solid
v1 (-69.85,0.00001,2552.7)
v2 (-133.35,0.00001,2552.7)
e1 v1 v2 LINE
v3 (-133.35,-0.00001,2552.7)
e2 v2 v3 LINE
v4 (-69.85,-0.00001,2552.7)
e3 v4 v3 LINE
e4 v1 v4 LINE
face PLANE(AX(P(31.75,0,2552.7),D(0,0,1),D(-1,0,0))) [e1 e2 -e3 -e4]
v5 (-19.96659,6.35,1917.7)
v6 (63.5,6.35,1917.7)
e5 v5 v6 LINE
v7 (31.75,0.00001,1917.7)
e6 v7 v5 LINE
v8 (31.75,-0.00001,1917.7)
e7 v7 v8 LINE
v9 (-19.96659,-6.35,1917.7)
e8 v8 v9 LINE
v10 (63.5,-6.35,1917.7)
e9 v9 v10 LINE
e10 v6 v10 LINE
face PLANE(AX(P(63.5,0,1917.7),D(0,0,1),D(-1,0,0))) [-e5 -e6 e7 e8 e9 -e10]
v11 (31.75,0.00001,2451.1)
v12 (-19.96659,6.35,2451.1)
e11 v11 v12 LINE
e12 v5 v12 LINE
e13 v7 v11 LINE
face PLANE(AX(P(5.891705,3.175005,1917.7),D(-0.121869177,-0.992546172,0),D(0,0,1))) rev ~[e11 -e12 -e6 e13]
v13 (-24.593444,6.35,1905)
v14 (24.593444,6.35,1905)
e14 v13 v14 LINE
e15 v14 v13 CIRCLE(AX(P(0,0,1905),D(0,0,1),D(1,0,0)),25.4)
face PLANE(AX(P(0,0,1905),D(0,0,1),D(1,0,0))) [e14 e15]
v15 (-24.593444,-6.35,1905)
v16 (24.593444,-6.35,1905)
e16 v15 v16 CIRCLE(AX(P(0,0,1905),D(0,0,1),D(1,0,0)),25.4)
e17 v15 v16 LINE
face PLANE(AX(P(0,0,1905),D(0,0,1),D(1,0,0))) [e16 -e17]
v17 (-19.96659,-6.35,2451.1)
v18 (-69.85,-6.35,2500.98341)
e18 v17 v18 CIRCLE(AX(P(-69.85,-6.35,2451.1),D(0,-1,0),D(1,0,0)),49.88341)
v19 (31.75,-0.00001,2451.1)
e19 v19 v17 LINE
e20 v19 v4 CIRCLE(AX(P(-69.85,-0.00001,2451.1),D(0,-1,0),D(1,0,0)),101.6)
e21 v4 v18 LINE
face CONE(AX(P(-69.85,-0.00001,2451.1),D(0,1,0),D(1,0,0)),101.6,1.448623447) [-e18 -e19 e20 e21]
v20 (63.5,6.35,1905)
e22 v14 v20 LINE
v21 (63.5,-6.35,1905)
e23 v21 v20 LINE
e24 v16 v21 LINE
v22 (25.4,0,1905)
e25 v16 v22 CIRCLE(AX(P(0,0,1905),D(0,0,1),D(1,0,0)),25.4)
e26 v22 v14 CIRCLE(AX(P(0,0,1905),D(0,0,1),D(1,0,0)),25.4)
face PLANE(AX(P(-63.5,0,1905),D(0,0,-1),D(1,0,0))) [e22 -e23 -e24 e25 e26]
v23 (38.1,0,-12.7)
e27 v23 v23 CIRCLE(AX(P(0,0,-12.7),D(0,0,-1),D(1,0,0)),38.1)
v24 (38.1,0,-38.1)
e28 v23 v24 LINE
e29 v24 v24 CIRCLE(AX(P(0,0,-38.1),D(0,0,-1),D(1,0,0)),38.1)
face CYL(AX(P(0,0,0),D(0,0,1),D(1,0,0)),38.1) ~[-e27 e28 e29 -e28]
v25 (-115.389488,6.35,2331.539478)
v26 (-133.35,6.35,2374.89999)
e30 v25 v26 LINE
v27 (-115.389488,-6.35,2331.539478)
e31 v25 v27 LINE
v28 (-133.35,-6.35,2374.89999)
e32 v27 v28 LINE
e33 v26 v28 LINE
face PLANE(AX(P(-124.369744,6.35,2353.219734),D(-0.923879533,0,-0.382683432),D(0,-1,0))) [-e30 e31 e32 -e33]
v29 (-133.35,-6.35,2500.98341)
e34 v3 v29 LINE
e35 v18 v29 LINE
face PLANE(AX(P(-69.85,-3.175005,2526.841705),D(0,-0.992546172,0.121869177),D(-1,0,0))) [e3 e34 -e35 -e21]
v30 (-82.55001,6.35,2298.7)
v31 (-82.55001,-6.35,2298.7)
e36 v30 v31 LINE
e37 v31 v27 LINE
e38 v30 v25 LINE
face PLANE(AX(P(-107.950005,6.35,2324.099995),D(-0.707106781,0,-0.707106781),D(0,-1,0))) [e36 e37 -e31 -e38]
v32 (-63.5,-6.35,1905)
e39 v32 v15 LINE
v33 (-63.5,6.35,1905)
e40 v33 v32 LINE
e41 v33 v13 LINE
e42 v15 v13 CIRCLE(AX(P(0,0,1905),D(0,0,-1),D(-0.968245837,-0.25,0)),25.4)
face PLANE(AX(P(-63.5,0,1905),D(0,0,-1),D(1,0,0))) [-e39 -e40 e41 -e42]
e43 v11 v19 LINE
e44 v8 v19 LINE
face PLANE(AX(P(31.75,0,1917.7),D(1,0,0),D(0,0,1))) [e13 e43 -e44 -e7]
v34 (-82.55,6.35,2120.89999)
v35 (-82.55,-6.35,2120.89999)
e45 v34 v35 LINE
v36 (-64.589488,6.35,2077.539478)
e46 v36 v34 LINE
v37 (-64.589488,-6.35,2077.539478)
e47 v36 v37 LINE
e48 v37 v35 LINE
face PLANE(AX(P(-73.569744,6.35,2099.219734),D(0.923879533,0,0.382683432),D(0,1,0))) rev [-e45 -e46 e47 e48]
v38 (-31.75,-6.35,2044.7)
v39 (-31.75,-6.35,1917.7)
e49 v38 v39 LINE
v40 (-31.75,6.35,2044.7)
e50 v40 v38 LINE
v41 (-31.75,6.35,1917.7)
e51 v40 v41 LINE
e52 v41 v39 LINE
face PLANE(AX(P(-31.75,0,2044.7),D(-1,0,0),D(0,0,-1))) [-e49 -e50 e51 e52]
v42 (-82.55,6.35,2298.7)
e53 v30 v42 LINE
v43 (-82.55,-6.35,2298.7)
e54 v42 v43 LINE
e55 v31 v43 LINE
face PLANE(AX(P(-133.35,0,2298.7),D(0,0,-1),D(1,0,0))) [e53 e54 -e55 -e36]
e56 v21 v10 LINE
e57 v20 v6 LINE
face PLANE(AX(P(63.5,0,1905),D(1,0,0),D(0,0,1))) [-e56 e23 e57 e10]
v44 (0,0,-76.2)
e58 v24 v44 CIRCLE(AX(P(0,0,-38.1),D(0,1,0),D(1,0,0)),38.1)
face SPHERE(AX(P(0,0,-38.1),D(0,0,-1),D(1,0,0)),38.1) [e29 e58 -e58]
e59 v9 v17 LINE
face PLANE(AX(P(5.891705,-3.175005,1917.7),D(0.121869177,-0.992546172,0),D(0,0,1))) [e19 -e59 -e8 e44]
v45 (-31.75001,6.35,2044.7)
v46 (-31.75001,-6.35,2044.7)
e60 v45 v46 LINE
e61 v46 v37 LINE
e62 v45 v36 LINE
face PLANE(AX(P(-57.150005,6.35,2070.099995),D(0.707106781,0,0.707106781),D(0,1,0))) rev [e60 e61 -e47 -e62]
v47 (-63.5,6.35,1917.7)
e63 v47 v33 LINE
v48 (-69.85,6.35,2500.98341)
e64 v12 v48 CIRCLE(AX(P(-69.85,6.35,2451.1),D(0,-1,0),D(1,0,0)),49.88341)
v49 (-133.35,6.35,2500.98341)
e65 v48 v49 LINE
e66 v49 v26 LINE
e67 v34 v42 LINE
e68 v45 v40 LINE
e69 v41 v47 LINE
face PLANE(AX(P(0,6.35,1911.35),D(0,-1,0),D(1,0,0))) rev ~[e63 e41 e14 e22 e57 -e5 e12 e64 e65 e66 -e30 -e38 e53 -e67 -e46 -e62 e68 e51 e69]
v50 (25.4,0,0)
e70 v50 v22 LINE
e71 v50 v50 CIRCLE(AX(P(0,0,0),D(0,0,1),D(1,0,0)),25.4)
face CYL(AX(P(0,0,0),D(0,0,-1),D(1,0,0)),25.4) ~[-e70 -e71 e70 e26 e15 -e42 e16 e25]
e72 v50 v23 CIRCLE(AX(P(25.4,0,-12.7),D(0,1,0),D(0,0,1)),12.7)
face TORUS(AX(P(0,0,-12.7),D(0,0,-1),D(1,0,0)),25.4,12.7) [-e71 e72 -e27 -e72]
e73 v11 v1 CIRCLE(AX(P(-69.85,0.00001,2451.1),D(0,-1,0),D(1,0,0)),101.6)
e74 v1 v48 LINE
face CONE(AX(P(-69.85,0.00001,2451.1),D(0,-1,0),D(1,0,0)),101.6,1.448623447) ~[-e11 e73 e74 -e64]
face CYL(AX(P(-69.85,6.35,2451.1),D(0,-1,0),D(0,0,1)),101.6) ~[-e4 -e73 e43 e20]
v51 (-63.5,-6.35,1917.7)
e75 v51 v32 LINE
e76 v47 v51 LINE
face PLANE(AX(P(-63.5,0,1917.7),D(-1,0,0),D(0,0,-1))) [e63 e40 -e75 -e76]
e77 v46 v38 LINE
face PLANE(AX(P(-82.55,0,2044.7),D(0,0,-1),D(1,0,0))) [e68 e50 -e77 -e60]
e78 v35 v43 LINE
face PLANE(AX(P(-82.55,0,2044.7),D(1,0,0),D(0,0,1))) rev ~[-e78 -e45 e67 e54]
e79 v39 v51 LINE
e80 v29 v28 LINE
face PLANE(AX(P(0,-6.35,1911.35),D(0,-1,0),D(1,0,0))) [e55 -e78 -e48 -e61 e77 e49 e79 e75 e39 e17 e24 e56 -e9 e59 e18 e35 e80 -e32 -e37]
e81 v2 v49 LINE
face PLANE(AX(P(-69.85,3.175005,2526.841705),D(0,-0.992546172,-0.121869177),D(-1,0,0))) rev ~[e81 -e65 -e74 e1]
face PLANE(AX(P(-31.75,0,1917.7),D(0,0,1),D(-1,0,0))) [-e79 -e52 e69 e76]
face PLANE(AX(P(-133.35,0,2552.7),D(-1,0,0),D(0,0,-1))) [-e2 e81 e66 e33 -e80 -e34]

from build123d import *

# Parameters (mm, degrees)
F0_R          = 25.4
F1_DEPTH      = 1905
F2_R          = 38.1
F3_DEPTH      = 76.2
F4_W          = 50.8
F4_H          = 254
F5_DEPTH      = 6.35
F5_DEPTH_BACK = 6.35
F6_SIZE       = 50.79999
F7_R          = 101.6
F8_SIZE2      = 51.71659
F8_SIZE       = 6.34999
F9_SIZE       = 25.4
F11_R         = 38.1


# Not quite as in the source:
# - a fillet or chamfer that OpenCascade refuses, or shapes differently, is made with other operations: its cross-section is extruded or revolved along the edge and cut away or added
# - a fillet or chamfer is up to 0.001 mm smaller than in the source, because OpenCascade refuses the exact size


with BuildPart() as f1:
    # F0 (on Top) → F1 (new body)
    with BuildSketch(Plane.XY):
        Circle(F0_R)
    extrude(amount=F1_DEPTH)

    # F2 (on face) → F3 (join)
    with BuildSketch(Plane(origin=(0, 0, 0), x_dir=(1, 0, 0), z_dir=(0, 0, -1))):
        Circle(F2_R)
    extrude(amount=F3_DEPTH)

    # F4 (on Front) → F5 (join, two sides)
    with BuildSketch(Plane.XZ) as f5_sk:
        Polygon((-25.4, 1905), (0, 1905), (25.4, 1905), (63.5, 1905), (63.5, 1917.7), (31.75, 1917.7), (0, 1917.7), (-31.75, 1917.7), (-63.5, 1917.7), (-63.5, 1905), align=None)
        Polygon((0, 1917.7), (31.75, 1917.7), (31.75, 2552.7), (-31.75, 2552.7), (-31.75, 2298.7), (-31.75, 2044.7), (-31.75, 1917.7), align=None)
        with Locations((-57.15, 2171.7)):
            Rectangle(F4_W, F4_H)
        Polygon((-31.75, 2298.7), (-31.75, 2552.7), (-133.35, 2552.7), (-133.35, 2298.7), (-82.55, 2298.7), align=None)
    extrude(amount=F5_DEPTH)
    extrude(f5_sk.sketch, amount=-F5_DEPTH_BACK)

    # F6 (size 50.8 in the source; OpenCascade refuses exactly that, so slightly less here)
    f6_edges = [f1.edges().sort_by_distance(p)[0] for p in [
        (-133.35, 0, 2298.7),
        (-82.55, 0, 2044.7),
    ]]
    chamfer(f6_edges, length=F6_SIZE)

    # F7
    f7_edges = [f1.edges().sort_by_distance(p)[0] for p in [
        (31.75, 0, 2552.7),
    ]]
    fillet(f7_edges, radius=F7_R)

    # F8 (size 6.35 and 51.7165998176 in the source; OpenCascade refuses exactly that, so slightly less here)
    f8_edges = [f1.edges().sort_by_distance(p)[0] for p in [
        (31.75, 6.35, 2184.4),
        (31.75, -6.35, 2184.4),
    ]]
    f8_side = f1.faces().sort_by_distance((31.75, 0, 2184.4))[0]
    chamfer(f8_edges, length=F8_SIZE, length2=F8_SIZE2, reference=f8_side)

    # F9
    f9_edges = [f1.edges().sort_by_distance(p)[0] for p in [
        (-133.35, 0, 2349.49999),
        (-82.55, 0, 2095.49999),
    ]]
    chamfer(f9_edges, length=F9_SIZE)

    # F10: fillet of radius 12.7 on 1 edges, made by hand

    # F10_s1 → F10_t2 (revolve, cut)
    with BuildSketch(Plane.XZ):
        with BuildLine():
            ThreePointArc((25.4, 0), (34.3802561211, -3.7197438789), (38.1, -12.7))
            Line((38.1, -12.7), (38.1, 0))
            Line((38.1, 0), (25.4, 0))
        make_face()
    revolve(axis=Axis((0, 0, 0), (0, 0, -1)), mode=Mode.SUBTRACT)

    # F11
    f11_edges = [f1.edges().sort_by_distance(p)[0] for p in [
        (-38.1, 0, -76.2),
    ]]
    fillet(f11_edges, radius=F11_R)


solid = f1.part
